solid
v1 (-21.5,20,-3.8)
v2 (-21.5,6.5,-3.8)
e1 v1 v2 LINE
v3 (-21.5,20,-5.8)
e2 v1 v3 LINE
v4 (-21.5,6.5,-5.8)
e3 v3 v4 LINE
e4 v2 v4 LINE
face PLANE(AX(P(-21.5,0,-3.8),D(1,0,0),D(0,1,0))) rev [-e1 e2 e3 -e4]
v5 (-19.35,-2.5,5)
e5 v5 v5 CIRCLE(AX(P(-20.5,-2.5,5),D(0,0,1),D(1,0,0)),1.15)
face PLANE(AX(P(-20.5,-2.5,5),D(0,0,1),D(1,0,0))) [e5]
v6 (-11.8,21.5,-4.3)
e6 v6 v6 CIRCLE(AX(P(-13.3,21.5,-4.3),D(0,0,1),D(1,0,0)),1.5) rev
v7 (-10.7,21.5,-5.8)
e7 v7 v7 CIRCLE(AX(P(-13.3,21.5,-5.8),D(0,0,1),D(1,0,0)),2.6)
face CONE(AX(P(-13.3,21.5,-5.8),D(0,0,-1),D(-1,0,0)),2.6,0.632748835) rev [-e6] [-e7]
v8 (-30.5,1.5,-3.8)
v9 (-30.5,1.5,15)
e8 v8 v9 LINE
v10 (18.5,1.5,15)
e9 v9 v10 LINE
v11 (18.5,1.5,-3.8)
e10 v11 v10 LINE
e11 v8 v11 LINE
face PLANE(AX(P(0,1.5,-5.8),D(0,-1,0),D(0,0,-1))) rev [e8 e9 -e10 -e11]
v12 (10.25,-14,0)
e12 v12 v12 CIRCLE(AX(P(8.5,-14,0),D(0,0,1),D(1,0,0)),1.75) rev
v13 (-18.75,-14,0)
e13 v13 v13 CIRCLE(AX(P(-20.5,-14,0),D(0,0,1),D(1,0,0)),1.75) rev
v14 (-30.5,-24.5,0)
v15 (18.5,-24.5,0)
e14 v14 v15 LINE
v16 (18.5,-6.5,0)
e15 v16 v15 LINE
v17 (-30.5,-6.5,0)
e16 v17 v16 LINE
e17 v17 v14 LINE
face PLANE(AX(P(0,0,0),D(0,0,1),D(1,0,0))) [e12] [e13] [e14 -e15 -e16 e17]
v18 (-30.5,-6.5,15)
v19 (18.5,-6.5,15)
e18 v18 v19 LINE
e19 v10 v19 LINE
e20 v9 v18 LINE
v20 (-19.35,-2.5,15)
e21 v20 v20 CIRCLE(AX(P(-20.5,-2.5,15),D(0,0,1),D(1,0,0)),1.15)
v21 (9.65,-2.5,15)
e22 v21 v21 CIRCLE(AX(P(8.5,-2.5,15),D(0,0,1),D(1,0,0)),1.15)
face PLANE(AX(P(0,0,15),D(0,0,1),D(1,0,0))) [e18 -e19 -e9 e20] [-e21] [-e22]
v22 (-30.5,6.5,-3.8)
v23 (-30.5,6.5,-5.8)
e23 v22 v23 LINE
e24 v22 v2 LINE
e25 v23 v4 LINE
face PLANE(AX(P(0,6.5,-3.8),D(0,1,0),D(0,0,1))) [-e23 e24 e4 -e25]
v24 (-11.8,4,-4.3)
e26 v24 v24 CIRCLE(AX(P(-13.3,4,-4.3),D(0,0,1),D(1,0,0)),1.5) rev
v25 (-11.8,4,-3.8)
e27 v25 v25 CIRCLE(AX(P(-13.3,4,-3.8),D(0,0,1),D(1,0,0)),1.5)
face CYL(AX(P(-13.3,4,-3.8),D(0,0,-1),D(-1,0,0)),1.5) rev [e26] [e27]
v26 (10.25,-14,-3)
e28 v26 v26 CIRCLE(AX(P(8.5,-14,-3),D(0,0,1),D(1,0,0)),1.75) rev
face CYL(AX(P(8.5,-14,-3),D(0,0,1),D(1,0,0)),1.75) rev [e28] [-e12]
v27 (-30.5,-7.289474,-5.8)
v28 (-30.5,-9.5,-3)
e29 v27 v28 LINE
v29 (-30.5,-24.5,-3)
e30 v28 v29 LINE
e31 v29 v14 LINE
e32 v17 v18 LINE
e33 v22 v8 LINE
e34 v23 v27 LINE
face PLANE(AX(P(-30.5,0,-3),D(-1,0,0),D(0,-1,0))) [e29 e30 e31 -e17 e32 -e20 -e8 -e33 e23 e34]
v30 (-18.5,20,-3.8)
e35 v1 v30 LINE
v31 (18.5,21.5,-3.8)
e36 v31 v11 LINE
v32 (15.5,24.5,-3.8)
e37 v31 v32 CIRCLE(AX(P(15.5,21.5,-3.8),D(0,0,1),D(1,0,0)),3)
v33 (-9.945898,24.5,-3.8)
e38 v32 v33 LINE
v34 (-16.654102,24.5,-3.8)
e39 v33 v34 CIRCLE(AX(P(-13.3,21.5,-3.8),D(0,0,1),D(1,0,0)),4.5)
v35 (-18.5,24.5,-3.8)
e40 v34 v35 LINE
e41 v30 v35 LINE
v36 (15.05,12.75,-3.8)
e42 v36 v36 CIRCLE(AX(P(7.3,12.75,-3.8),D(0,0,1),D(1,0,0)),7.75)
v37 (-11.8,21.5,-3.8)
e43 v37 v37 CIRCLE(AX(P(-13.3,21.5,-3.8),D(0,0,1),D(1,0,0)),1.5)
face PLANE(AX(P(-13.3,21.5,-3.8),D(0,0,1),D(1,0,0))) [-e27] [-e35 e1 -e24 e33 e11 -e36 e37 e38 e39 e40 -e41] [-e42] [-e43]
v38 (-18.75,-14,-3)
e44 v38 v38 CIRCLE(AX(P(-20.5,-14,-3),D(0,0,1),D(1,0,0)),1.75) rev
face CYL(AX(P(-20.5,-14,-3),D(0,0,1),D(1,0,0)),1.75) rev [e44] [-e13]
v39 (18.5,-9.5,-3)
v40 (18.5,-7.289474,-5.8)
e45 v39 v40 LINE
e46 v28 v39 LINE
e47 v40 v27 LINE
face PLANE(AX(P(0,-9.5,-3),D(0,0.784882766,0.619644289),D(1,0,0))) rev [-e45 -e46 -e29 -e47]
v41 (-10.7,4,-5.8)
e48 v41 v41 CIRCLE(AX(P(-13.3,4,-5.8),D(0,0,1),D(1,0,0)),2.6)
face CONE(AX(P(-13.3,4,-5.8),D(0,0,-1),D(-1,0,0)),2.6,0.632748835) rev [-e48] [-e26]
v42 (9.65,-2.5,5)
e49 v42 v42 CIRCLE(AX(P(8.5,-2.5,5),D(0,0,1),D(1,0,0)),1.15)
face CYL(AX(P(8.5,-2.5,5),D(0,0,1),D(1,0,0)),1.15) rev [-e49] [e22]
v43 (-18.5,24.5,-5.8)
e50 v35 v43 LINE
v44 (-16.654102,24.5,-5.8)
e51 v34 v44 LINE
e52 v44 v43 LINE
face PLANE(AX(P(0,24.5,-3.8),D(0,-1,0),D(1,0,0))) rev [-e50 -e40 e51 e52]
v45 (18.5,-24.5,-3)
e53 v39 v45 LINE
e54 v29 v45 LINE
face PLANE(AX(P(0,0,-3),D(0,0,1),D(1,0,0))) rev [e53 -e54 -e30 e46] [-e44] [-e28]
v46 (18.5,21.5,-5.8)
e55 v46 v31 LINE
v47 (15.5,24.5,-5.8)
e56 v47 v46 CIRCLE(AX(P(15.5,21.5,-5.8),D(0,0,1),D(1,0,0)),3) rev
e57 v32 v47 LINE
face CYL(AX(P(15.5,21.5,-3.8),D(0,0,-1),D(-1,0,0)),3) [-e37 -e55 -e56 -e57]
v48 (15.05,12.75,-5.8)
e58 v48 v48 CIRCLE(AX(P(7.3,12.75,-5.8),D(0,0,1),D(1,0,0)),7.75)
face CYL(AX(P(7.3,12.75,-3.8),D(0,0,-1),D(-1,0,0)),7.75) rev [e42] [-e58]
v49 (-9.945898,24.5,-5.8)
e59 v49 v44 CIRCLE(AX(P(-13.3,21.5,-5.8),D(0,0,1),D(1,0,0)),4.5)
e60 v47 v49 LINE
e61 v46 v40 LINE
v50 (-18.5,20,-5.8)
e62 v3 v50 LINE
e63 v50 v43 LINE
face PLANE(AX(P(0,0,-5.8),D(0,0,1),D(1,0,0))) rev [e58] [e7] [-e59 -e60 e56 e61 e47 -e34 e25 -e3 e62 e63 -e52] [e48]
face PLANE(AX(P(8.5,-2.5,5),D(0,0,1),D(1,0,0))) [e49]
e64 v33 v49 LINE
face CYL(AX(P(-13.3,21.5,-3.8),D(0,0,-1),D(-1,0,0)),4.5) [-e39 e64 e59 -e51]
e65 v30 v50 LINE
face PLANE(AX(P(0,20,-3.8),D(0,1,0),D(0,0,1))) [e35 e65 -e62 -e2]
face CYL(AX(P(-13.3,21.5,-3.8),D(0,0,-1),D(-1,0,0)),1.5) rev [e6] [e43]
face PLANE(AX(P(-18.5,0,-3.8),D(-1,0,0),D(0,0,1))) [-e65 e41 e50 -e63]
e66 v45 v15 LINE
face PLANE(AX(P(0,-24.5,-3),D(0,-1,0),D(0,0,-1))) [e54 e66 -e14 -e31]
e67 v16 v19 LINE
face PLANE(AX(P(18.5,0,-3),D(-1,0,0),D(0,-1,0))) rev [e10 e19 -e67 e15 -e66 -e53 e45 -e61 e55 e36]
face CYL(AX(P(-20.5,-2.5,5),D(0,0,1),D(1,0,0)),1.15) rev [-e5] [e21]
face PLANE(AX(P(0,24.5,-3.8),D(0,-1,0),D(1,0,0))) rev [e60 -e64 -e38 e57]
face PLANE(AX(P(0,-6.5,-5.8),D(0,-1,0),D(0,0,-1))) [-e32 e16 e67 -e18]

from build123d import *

# Parameters (mm, degrees)
SKETCH_5_R              = 1.75
EXTRUDE_15981_DEPTH     = 3
EXTRUDE_2_DEPTH         = 15
EXTRUDE_2_DEPTH_BACK    = 5.8
SKETCH_6_W              = 49
SKETCH_6_H              = 8
EXTRUDE_START           = -5.8
SKETCH_7_R              = 1.5
SKETCH_7_R_2            = 7.75
EXTRUDE_3_DEPTH         = 2
CUT_EXTRUDE_START       = 15
SKETCH_9_R              = 1.15
CUT_EXTRUDE_16680_DEPTH = 10
CHAMFER_16885_SIZE      = 3
CHAMFER_16885_SIZE_2    = 3.8
FILLET_16929_R          = 3


with BuildPart() as part:
    # Sketch 5 → Extrude 15981 (new body)
    with BuildSketch(Plane.XY):
        Polygon((18.5, -24.5), (18.5, -6.5), (-30.5, -6.5), (-30.5, -24.5), (-18.5, -24.5), align=None)
        with Locations((-20.5, -14)):
            Circle(SKETCH_5_R, mode=Mode.SUBTRACT)
        with Locations((8.5, -14)):
            Circle(SKETCH_5_R, mode=Mode.SUBTRACT)
    extrude(amount=-EXTRUDE_15981_DEPTH)

    # Эскиз внешнего крепления двигателя колеса<6> → Extrude 2 (add, two sides: drawn at the far end of the back side and taken through both)
    with BuildSketch(Plane.XY.offset(-EXTRUDE_2_DEPTH_BACK)):
        with Locations((-6, -2.5)):
            Rectangle(SKETCH_6_W, SKETCH_6_H)
    extrude(amount=EXTRUDE_2_DEPTH + EXTRUDE_2_DEPTH_BACK)

    # Sketch 7 → Extrude 3 (add)
    with BuildSketch(Plane.XY.offset(EXTRUDE_START)):
        with BuildLine():
            ThreePointArc((-9.945898034, 24.5), (-13.3, 26), (-16.654101966, 24.5))
            Line((-16.654101966, 24.5), (-18.5, 24.5))
            Line((-18.5, 24.5), (-18.5, 20))
            Line((-18.5, 20), (-21.5, 20))
            Line((-21.5, 20), (-21.5, 6.5))
            Line((-21.5, 6.5), (-30.5, 6.5))
            Line((-30.5, 6.5), (-30.5, 1.5))
            Line((-30.5, 1.5), (18.5, 1.5))
            Line((18.5, 1.5), (18.5, 24.5))
            Line((18.5, 24.5), (-9.945898034, 24.5))
        make_face()
        with Locations((-13.3, 4)):
            Circle(SKETCH_7_R, mode=Mode.SUBTRACT)
        with Locations((-13.3, 21.5)):
            Circle(SKETCH_7_R, mode=Mode.SUBTRACT)
        with Locations((7.3, 12.75)):
            Circle(SKETCH_7_R_2, mode=Mode.SUBTRACT)
    extrude(amount=EXTRUDE_3_DEPTH)

    # Sketch 9 → Cut-Extrude 16680 (cut)
    with BuildSketch(Plane.XY.offset(CUT_EXTRUDE_START)):
        with Locations((8.5, -2.5)):
            Circle(SKETCH_9_R)
        with Locations((-20.5, -2.5)):
            Circle(SKETCH_9_R)
    extrude(amount=-CUT_EXTRUDE_16680_DEPTH, mode=Mode.SUBTRACT)

    # Chamfer 16786: read off the stored shape, not the designer's step
    # Chamfer 16786: loft between two sections, ruled curve by curve
    chamfer_16786_from = [
        Edge.make_three_point_arc((-11.8, 4, -4.3), (-13.3, 2.5, -4.3), (-14.8, 4, -4.3)),
        Edge.make_three_point_arc((-14.8, 4, -4.3), (-13.3, 5.5, -4.3), (-11.8, 4, -4.3)),
    ]
    chamfer_16786_to = [
        Edge.make_three_point_arc((-10.7, 4, -5.8), (-13.3, 1.4, -5.8), (-15.9, 4, -5.8)),
        Edge.make_three_point_arc((-15.9, 4, -5.8), (-13.3, 6.6, -5.8), (-10.7, 4, -5.8)),
    ]
    chamfer_16786 = Solid(Shell([*[Face.make_surface_from_curves(chamfer_16786_from[k], chamfer_16786_to[k]) for k in range(2)], Face(Wire(chamfer_16786_from)), Face(Wire(chamfer_16786_to))]))
    add(chamfer_16786, mode=Mode.SUBTRACT)

    # Chamfer 16786 2: loft between two sections, ruled curve by curve
    chamfer_16786_2_from = [
        Edge.make_three_point_arc((-11.8, 21.5, -4.3), (-13.3, 20, -4.3), (-14.8, 21.5, -4.3)),
        Edge.make_three_point_arc((-14.8, 21.5, -4.3), (-13.3, 23, -4.3), (-11.8, 21.5, -4.3)),
    ]
    chamfer_16786_2_to = [
        Edge.make_three_point_arc((-10.7, 21.5, -5.8), (-13.3, 18.9, -5.8), (-15.9, 21.5, -5.8)),
        Edge.make_three_point_arc((-15.9, 21.5, -5.8), (-13.3, 24.1, -5.8), (-10.7, 21.5, -5.8)),
    ]
    chamfer_16786_2 = Solid(Shell([*[Face.make_surface_from_curves(chamfer_16786_2_from[k], chamfer_16786_2_to[k]) for k in range(2)], Face(Wire(chamfer_16786_2_from)), Face(Wire(chamfer_16786_2_to))]))
    add(chamfer_16786_2, mode=Mode.SUBTRACT)

    # Chamfer 16885
    # the kernel refuses this chamfer: 3.8, 3 mm, written as the material it adds along each edge
    with BuildSketch(Plane(origin=(18.5, -6.5, -3), x_dir=(0, -1, 0), z_dir=(-1, 0, 0))) as chamfer_16885_piece_1_section:
        Polygon((CHAMFER_16885_SIZE, 0), (0, -CHAMFER_16885_SIZE_2), (0, 0), align=None)
    chamfer_16885_piece_1 = extrude(amount=49, mode=Mode.PRIVATE)
    chamfer_16885_piece_1 = split(chamfer_16885_piece_1, bisect_by=Plane(origin=(18.5, -6.5, -5.8), z_dir=(0, 0, 1)), keep=Keep.TOP, mode=Mode.PRIVATE)
    add(chamfer_16885_piece_1)

    # Fillet 16929
    fillet_16929_edges = [part.edges().sort_by_distance(p)[0] for p in [
        (18.5, 24.5, -4.8),
    ]]
    fillet(fillet_16929_edges, radius=FILLET_16929_R)


solid = part.part
